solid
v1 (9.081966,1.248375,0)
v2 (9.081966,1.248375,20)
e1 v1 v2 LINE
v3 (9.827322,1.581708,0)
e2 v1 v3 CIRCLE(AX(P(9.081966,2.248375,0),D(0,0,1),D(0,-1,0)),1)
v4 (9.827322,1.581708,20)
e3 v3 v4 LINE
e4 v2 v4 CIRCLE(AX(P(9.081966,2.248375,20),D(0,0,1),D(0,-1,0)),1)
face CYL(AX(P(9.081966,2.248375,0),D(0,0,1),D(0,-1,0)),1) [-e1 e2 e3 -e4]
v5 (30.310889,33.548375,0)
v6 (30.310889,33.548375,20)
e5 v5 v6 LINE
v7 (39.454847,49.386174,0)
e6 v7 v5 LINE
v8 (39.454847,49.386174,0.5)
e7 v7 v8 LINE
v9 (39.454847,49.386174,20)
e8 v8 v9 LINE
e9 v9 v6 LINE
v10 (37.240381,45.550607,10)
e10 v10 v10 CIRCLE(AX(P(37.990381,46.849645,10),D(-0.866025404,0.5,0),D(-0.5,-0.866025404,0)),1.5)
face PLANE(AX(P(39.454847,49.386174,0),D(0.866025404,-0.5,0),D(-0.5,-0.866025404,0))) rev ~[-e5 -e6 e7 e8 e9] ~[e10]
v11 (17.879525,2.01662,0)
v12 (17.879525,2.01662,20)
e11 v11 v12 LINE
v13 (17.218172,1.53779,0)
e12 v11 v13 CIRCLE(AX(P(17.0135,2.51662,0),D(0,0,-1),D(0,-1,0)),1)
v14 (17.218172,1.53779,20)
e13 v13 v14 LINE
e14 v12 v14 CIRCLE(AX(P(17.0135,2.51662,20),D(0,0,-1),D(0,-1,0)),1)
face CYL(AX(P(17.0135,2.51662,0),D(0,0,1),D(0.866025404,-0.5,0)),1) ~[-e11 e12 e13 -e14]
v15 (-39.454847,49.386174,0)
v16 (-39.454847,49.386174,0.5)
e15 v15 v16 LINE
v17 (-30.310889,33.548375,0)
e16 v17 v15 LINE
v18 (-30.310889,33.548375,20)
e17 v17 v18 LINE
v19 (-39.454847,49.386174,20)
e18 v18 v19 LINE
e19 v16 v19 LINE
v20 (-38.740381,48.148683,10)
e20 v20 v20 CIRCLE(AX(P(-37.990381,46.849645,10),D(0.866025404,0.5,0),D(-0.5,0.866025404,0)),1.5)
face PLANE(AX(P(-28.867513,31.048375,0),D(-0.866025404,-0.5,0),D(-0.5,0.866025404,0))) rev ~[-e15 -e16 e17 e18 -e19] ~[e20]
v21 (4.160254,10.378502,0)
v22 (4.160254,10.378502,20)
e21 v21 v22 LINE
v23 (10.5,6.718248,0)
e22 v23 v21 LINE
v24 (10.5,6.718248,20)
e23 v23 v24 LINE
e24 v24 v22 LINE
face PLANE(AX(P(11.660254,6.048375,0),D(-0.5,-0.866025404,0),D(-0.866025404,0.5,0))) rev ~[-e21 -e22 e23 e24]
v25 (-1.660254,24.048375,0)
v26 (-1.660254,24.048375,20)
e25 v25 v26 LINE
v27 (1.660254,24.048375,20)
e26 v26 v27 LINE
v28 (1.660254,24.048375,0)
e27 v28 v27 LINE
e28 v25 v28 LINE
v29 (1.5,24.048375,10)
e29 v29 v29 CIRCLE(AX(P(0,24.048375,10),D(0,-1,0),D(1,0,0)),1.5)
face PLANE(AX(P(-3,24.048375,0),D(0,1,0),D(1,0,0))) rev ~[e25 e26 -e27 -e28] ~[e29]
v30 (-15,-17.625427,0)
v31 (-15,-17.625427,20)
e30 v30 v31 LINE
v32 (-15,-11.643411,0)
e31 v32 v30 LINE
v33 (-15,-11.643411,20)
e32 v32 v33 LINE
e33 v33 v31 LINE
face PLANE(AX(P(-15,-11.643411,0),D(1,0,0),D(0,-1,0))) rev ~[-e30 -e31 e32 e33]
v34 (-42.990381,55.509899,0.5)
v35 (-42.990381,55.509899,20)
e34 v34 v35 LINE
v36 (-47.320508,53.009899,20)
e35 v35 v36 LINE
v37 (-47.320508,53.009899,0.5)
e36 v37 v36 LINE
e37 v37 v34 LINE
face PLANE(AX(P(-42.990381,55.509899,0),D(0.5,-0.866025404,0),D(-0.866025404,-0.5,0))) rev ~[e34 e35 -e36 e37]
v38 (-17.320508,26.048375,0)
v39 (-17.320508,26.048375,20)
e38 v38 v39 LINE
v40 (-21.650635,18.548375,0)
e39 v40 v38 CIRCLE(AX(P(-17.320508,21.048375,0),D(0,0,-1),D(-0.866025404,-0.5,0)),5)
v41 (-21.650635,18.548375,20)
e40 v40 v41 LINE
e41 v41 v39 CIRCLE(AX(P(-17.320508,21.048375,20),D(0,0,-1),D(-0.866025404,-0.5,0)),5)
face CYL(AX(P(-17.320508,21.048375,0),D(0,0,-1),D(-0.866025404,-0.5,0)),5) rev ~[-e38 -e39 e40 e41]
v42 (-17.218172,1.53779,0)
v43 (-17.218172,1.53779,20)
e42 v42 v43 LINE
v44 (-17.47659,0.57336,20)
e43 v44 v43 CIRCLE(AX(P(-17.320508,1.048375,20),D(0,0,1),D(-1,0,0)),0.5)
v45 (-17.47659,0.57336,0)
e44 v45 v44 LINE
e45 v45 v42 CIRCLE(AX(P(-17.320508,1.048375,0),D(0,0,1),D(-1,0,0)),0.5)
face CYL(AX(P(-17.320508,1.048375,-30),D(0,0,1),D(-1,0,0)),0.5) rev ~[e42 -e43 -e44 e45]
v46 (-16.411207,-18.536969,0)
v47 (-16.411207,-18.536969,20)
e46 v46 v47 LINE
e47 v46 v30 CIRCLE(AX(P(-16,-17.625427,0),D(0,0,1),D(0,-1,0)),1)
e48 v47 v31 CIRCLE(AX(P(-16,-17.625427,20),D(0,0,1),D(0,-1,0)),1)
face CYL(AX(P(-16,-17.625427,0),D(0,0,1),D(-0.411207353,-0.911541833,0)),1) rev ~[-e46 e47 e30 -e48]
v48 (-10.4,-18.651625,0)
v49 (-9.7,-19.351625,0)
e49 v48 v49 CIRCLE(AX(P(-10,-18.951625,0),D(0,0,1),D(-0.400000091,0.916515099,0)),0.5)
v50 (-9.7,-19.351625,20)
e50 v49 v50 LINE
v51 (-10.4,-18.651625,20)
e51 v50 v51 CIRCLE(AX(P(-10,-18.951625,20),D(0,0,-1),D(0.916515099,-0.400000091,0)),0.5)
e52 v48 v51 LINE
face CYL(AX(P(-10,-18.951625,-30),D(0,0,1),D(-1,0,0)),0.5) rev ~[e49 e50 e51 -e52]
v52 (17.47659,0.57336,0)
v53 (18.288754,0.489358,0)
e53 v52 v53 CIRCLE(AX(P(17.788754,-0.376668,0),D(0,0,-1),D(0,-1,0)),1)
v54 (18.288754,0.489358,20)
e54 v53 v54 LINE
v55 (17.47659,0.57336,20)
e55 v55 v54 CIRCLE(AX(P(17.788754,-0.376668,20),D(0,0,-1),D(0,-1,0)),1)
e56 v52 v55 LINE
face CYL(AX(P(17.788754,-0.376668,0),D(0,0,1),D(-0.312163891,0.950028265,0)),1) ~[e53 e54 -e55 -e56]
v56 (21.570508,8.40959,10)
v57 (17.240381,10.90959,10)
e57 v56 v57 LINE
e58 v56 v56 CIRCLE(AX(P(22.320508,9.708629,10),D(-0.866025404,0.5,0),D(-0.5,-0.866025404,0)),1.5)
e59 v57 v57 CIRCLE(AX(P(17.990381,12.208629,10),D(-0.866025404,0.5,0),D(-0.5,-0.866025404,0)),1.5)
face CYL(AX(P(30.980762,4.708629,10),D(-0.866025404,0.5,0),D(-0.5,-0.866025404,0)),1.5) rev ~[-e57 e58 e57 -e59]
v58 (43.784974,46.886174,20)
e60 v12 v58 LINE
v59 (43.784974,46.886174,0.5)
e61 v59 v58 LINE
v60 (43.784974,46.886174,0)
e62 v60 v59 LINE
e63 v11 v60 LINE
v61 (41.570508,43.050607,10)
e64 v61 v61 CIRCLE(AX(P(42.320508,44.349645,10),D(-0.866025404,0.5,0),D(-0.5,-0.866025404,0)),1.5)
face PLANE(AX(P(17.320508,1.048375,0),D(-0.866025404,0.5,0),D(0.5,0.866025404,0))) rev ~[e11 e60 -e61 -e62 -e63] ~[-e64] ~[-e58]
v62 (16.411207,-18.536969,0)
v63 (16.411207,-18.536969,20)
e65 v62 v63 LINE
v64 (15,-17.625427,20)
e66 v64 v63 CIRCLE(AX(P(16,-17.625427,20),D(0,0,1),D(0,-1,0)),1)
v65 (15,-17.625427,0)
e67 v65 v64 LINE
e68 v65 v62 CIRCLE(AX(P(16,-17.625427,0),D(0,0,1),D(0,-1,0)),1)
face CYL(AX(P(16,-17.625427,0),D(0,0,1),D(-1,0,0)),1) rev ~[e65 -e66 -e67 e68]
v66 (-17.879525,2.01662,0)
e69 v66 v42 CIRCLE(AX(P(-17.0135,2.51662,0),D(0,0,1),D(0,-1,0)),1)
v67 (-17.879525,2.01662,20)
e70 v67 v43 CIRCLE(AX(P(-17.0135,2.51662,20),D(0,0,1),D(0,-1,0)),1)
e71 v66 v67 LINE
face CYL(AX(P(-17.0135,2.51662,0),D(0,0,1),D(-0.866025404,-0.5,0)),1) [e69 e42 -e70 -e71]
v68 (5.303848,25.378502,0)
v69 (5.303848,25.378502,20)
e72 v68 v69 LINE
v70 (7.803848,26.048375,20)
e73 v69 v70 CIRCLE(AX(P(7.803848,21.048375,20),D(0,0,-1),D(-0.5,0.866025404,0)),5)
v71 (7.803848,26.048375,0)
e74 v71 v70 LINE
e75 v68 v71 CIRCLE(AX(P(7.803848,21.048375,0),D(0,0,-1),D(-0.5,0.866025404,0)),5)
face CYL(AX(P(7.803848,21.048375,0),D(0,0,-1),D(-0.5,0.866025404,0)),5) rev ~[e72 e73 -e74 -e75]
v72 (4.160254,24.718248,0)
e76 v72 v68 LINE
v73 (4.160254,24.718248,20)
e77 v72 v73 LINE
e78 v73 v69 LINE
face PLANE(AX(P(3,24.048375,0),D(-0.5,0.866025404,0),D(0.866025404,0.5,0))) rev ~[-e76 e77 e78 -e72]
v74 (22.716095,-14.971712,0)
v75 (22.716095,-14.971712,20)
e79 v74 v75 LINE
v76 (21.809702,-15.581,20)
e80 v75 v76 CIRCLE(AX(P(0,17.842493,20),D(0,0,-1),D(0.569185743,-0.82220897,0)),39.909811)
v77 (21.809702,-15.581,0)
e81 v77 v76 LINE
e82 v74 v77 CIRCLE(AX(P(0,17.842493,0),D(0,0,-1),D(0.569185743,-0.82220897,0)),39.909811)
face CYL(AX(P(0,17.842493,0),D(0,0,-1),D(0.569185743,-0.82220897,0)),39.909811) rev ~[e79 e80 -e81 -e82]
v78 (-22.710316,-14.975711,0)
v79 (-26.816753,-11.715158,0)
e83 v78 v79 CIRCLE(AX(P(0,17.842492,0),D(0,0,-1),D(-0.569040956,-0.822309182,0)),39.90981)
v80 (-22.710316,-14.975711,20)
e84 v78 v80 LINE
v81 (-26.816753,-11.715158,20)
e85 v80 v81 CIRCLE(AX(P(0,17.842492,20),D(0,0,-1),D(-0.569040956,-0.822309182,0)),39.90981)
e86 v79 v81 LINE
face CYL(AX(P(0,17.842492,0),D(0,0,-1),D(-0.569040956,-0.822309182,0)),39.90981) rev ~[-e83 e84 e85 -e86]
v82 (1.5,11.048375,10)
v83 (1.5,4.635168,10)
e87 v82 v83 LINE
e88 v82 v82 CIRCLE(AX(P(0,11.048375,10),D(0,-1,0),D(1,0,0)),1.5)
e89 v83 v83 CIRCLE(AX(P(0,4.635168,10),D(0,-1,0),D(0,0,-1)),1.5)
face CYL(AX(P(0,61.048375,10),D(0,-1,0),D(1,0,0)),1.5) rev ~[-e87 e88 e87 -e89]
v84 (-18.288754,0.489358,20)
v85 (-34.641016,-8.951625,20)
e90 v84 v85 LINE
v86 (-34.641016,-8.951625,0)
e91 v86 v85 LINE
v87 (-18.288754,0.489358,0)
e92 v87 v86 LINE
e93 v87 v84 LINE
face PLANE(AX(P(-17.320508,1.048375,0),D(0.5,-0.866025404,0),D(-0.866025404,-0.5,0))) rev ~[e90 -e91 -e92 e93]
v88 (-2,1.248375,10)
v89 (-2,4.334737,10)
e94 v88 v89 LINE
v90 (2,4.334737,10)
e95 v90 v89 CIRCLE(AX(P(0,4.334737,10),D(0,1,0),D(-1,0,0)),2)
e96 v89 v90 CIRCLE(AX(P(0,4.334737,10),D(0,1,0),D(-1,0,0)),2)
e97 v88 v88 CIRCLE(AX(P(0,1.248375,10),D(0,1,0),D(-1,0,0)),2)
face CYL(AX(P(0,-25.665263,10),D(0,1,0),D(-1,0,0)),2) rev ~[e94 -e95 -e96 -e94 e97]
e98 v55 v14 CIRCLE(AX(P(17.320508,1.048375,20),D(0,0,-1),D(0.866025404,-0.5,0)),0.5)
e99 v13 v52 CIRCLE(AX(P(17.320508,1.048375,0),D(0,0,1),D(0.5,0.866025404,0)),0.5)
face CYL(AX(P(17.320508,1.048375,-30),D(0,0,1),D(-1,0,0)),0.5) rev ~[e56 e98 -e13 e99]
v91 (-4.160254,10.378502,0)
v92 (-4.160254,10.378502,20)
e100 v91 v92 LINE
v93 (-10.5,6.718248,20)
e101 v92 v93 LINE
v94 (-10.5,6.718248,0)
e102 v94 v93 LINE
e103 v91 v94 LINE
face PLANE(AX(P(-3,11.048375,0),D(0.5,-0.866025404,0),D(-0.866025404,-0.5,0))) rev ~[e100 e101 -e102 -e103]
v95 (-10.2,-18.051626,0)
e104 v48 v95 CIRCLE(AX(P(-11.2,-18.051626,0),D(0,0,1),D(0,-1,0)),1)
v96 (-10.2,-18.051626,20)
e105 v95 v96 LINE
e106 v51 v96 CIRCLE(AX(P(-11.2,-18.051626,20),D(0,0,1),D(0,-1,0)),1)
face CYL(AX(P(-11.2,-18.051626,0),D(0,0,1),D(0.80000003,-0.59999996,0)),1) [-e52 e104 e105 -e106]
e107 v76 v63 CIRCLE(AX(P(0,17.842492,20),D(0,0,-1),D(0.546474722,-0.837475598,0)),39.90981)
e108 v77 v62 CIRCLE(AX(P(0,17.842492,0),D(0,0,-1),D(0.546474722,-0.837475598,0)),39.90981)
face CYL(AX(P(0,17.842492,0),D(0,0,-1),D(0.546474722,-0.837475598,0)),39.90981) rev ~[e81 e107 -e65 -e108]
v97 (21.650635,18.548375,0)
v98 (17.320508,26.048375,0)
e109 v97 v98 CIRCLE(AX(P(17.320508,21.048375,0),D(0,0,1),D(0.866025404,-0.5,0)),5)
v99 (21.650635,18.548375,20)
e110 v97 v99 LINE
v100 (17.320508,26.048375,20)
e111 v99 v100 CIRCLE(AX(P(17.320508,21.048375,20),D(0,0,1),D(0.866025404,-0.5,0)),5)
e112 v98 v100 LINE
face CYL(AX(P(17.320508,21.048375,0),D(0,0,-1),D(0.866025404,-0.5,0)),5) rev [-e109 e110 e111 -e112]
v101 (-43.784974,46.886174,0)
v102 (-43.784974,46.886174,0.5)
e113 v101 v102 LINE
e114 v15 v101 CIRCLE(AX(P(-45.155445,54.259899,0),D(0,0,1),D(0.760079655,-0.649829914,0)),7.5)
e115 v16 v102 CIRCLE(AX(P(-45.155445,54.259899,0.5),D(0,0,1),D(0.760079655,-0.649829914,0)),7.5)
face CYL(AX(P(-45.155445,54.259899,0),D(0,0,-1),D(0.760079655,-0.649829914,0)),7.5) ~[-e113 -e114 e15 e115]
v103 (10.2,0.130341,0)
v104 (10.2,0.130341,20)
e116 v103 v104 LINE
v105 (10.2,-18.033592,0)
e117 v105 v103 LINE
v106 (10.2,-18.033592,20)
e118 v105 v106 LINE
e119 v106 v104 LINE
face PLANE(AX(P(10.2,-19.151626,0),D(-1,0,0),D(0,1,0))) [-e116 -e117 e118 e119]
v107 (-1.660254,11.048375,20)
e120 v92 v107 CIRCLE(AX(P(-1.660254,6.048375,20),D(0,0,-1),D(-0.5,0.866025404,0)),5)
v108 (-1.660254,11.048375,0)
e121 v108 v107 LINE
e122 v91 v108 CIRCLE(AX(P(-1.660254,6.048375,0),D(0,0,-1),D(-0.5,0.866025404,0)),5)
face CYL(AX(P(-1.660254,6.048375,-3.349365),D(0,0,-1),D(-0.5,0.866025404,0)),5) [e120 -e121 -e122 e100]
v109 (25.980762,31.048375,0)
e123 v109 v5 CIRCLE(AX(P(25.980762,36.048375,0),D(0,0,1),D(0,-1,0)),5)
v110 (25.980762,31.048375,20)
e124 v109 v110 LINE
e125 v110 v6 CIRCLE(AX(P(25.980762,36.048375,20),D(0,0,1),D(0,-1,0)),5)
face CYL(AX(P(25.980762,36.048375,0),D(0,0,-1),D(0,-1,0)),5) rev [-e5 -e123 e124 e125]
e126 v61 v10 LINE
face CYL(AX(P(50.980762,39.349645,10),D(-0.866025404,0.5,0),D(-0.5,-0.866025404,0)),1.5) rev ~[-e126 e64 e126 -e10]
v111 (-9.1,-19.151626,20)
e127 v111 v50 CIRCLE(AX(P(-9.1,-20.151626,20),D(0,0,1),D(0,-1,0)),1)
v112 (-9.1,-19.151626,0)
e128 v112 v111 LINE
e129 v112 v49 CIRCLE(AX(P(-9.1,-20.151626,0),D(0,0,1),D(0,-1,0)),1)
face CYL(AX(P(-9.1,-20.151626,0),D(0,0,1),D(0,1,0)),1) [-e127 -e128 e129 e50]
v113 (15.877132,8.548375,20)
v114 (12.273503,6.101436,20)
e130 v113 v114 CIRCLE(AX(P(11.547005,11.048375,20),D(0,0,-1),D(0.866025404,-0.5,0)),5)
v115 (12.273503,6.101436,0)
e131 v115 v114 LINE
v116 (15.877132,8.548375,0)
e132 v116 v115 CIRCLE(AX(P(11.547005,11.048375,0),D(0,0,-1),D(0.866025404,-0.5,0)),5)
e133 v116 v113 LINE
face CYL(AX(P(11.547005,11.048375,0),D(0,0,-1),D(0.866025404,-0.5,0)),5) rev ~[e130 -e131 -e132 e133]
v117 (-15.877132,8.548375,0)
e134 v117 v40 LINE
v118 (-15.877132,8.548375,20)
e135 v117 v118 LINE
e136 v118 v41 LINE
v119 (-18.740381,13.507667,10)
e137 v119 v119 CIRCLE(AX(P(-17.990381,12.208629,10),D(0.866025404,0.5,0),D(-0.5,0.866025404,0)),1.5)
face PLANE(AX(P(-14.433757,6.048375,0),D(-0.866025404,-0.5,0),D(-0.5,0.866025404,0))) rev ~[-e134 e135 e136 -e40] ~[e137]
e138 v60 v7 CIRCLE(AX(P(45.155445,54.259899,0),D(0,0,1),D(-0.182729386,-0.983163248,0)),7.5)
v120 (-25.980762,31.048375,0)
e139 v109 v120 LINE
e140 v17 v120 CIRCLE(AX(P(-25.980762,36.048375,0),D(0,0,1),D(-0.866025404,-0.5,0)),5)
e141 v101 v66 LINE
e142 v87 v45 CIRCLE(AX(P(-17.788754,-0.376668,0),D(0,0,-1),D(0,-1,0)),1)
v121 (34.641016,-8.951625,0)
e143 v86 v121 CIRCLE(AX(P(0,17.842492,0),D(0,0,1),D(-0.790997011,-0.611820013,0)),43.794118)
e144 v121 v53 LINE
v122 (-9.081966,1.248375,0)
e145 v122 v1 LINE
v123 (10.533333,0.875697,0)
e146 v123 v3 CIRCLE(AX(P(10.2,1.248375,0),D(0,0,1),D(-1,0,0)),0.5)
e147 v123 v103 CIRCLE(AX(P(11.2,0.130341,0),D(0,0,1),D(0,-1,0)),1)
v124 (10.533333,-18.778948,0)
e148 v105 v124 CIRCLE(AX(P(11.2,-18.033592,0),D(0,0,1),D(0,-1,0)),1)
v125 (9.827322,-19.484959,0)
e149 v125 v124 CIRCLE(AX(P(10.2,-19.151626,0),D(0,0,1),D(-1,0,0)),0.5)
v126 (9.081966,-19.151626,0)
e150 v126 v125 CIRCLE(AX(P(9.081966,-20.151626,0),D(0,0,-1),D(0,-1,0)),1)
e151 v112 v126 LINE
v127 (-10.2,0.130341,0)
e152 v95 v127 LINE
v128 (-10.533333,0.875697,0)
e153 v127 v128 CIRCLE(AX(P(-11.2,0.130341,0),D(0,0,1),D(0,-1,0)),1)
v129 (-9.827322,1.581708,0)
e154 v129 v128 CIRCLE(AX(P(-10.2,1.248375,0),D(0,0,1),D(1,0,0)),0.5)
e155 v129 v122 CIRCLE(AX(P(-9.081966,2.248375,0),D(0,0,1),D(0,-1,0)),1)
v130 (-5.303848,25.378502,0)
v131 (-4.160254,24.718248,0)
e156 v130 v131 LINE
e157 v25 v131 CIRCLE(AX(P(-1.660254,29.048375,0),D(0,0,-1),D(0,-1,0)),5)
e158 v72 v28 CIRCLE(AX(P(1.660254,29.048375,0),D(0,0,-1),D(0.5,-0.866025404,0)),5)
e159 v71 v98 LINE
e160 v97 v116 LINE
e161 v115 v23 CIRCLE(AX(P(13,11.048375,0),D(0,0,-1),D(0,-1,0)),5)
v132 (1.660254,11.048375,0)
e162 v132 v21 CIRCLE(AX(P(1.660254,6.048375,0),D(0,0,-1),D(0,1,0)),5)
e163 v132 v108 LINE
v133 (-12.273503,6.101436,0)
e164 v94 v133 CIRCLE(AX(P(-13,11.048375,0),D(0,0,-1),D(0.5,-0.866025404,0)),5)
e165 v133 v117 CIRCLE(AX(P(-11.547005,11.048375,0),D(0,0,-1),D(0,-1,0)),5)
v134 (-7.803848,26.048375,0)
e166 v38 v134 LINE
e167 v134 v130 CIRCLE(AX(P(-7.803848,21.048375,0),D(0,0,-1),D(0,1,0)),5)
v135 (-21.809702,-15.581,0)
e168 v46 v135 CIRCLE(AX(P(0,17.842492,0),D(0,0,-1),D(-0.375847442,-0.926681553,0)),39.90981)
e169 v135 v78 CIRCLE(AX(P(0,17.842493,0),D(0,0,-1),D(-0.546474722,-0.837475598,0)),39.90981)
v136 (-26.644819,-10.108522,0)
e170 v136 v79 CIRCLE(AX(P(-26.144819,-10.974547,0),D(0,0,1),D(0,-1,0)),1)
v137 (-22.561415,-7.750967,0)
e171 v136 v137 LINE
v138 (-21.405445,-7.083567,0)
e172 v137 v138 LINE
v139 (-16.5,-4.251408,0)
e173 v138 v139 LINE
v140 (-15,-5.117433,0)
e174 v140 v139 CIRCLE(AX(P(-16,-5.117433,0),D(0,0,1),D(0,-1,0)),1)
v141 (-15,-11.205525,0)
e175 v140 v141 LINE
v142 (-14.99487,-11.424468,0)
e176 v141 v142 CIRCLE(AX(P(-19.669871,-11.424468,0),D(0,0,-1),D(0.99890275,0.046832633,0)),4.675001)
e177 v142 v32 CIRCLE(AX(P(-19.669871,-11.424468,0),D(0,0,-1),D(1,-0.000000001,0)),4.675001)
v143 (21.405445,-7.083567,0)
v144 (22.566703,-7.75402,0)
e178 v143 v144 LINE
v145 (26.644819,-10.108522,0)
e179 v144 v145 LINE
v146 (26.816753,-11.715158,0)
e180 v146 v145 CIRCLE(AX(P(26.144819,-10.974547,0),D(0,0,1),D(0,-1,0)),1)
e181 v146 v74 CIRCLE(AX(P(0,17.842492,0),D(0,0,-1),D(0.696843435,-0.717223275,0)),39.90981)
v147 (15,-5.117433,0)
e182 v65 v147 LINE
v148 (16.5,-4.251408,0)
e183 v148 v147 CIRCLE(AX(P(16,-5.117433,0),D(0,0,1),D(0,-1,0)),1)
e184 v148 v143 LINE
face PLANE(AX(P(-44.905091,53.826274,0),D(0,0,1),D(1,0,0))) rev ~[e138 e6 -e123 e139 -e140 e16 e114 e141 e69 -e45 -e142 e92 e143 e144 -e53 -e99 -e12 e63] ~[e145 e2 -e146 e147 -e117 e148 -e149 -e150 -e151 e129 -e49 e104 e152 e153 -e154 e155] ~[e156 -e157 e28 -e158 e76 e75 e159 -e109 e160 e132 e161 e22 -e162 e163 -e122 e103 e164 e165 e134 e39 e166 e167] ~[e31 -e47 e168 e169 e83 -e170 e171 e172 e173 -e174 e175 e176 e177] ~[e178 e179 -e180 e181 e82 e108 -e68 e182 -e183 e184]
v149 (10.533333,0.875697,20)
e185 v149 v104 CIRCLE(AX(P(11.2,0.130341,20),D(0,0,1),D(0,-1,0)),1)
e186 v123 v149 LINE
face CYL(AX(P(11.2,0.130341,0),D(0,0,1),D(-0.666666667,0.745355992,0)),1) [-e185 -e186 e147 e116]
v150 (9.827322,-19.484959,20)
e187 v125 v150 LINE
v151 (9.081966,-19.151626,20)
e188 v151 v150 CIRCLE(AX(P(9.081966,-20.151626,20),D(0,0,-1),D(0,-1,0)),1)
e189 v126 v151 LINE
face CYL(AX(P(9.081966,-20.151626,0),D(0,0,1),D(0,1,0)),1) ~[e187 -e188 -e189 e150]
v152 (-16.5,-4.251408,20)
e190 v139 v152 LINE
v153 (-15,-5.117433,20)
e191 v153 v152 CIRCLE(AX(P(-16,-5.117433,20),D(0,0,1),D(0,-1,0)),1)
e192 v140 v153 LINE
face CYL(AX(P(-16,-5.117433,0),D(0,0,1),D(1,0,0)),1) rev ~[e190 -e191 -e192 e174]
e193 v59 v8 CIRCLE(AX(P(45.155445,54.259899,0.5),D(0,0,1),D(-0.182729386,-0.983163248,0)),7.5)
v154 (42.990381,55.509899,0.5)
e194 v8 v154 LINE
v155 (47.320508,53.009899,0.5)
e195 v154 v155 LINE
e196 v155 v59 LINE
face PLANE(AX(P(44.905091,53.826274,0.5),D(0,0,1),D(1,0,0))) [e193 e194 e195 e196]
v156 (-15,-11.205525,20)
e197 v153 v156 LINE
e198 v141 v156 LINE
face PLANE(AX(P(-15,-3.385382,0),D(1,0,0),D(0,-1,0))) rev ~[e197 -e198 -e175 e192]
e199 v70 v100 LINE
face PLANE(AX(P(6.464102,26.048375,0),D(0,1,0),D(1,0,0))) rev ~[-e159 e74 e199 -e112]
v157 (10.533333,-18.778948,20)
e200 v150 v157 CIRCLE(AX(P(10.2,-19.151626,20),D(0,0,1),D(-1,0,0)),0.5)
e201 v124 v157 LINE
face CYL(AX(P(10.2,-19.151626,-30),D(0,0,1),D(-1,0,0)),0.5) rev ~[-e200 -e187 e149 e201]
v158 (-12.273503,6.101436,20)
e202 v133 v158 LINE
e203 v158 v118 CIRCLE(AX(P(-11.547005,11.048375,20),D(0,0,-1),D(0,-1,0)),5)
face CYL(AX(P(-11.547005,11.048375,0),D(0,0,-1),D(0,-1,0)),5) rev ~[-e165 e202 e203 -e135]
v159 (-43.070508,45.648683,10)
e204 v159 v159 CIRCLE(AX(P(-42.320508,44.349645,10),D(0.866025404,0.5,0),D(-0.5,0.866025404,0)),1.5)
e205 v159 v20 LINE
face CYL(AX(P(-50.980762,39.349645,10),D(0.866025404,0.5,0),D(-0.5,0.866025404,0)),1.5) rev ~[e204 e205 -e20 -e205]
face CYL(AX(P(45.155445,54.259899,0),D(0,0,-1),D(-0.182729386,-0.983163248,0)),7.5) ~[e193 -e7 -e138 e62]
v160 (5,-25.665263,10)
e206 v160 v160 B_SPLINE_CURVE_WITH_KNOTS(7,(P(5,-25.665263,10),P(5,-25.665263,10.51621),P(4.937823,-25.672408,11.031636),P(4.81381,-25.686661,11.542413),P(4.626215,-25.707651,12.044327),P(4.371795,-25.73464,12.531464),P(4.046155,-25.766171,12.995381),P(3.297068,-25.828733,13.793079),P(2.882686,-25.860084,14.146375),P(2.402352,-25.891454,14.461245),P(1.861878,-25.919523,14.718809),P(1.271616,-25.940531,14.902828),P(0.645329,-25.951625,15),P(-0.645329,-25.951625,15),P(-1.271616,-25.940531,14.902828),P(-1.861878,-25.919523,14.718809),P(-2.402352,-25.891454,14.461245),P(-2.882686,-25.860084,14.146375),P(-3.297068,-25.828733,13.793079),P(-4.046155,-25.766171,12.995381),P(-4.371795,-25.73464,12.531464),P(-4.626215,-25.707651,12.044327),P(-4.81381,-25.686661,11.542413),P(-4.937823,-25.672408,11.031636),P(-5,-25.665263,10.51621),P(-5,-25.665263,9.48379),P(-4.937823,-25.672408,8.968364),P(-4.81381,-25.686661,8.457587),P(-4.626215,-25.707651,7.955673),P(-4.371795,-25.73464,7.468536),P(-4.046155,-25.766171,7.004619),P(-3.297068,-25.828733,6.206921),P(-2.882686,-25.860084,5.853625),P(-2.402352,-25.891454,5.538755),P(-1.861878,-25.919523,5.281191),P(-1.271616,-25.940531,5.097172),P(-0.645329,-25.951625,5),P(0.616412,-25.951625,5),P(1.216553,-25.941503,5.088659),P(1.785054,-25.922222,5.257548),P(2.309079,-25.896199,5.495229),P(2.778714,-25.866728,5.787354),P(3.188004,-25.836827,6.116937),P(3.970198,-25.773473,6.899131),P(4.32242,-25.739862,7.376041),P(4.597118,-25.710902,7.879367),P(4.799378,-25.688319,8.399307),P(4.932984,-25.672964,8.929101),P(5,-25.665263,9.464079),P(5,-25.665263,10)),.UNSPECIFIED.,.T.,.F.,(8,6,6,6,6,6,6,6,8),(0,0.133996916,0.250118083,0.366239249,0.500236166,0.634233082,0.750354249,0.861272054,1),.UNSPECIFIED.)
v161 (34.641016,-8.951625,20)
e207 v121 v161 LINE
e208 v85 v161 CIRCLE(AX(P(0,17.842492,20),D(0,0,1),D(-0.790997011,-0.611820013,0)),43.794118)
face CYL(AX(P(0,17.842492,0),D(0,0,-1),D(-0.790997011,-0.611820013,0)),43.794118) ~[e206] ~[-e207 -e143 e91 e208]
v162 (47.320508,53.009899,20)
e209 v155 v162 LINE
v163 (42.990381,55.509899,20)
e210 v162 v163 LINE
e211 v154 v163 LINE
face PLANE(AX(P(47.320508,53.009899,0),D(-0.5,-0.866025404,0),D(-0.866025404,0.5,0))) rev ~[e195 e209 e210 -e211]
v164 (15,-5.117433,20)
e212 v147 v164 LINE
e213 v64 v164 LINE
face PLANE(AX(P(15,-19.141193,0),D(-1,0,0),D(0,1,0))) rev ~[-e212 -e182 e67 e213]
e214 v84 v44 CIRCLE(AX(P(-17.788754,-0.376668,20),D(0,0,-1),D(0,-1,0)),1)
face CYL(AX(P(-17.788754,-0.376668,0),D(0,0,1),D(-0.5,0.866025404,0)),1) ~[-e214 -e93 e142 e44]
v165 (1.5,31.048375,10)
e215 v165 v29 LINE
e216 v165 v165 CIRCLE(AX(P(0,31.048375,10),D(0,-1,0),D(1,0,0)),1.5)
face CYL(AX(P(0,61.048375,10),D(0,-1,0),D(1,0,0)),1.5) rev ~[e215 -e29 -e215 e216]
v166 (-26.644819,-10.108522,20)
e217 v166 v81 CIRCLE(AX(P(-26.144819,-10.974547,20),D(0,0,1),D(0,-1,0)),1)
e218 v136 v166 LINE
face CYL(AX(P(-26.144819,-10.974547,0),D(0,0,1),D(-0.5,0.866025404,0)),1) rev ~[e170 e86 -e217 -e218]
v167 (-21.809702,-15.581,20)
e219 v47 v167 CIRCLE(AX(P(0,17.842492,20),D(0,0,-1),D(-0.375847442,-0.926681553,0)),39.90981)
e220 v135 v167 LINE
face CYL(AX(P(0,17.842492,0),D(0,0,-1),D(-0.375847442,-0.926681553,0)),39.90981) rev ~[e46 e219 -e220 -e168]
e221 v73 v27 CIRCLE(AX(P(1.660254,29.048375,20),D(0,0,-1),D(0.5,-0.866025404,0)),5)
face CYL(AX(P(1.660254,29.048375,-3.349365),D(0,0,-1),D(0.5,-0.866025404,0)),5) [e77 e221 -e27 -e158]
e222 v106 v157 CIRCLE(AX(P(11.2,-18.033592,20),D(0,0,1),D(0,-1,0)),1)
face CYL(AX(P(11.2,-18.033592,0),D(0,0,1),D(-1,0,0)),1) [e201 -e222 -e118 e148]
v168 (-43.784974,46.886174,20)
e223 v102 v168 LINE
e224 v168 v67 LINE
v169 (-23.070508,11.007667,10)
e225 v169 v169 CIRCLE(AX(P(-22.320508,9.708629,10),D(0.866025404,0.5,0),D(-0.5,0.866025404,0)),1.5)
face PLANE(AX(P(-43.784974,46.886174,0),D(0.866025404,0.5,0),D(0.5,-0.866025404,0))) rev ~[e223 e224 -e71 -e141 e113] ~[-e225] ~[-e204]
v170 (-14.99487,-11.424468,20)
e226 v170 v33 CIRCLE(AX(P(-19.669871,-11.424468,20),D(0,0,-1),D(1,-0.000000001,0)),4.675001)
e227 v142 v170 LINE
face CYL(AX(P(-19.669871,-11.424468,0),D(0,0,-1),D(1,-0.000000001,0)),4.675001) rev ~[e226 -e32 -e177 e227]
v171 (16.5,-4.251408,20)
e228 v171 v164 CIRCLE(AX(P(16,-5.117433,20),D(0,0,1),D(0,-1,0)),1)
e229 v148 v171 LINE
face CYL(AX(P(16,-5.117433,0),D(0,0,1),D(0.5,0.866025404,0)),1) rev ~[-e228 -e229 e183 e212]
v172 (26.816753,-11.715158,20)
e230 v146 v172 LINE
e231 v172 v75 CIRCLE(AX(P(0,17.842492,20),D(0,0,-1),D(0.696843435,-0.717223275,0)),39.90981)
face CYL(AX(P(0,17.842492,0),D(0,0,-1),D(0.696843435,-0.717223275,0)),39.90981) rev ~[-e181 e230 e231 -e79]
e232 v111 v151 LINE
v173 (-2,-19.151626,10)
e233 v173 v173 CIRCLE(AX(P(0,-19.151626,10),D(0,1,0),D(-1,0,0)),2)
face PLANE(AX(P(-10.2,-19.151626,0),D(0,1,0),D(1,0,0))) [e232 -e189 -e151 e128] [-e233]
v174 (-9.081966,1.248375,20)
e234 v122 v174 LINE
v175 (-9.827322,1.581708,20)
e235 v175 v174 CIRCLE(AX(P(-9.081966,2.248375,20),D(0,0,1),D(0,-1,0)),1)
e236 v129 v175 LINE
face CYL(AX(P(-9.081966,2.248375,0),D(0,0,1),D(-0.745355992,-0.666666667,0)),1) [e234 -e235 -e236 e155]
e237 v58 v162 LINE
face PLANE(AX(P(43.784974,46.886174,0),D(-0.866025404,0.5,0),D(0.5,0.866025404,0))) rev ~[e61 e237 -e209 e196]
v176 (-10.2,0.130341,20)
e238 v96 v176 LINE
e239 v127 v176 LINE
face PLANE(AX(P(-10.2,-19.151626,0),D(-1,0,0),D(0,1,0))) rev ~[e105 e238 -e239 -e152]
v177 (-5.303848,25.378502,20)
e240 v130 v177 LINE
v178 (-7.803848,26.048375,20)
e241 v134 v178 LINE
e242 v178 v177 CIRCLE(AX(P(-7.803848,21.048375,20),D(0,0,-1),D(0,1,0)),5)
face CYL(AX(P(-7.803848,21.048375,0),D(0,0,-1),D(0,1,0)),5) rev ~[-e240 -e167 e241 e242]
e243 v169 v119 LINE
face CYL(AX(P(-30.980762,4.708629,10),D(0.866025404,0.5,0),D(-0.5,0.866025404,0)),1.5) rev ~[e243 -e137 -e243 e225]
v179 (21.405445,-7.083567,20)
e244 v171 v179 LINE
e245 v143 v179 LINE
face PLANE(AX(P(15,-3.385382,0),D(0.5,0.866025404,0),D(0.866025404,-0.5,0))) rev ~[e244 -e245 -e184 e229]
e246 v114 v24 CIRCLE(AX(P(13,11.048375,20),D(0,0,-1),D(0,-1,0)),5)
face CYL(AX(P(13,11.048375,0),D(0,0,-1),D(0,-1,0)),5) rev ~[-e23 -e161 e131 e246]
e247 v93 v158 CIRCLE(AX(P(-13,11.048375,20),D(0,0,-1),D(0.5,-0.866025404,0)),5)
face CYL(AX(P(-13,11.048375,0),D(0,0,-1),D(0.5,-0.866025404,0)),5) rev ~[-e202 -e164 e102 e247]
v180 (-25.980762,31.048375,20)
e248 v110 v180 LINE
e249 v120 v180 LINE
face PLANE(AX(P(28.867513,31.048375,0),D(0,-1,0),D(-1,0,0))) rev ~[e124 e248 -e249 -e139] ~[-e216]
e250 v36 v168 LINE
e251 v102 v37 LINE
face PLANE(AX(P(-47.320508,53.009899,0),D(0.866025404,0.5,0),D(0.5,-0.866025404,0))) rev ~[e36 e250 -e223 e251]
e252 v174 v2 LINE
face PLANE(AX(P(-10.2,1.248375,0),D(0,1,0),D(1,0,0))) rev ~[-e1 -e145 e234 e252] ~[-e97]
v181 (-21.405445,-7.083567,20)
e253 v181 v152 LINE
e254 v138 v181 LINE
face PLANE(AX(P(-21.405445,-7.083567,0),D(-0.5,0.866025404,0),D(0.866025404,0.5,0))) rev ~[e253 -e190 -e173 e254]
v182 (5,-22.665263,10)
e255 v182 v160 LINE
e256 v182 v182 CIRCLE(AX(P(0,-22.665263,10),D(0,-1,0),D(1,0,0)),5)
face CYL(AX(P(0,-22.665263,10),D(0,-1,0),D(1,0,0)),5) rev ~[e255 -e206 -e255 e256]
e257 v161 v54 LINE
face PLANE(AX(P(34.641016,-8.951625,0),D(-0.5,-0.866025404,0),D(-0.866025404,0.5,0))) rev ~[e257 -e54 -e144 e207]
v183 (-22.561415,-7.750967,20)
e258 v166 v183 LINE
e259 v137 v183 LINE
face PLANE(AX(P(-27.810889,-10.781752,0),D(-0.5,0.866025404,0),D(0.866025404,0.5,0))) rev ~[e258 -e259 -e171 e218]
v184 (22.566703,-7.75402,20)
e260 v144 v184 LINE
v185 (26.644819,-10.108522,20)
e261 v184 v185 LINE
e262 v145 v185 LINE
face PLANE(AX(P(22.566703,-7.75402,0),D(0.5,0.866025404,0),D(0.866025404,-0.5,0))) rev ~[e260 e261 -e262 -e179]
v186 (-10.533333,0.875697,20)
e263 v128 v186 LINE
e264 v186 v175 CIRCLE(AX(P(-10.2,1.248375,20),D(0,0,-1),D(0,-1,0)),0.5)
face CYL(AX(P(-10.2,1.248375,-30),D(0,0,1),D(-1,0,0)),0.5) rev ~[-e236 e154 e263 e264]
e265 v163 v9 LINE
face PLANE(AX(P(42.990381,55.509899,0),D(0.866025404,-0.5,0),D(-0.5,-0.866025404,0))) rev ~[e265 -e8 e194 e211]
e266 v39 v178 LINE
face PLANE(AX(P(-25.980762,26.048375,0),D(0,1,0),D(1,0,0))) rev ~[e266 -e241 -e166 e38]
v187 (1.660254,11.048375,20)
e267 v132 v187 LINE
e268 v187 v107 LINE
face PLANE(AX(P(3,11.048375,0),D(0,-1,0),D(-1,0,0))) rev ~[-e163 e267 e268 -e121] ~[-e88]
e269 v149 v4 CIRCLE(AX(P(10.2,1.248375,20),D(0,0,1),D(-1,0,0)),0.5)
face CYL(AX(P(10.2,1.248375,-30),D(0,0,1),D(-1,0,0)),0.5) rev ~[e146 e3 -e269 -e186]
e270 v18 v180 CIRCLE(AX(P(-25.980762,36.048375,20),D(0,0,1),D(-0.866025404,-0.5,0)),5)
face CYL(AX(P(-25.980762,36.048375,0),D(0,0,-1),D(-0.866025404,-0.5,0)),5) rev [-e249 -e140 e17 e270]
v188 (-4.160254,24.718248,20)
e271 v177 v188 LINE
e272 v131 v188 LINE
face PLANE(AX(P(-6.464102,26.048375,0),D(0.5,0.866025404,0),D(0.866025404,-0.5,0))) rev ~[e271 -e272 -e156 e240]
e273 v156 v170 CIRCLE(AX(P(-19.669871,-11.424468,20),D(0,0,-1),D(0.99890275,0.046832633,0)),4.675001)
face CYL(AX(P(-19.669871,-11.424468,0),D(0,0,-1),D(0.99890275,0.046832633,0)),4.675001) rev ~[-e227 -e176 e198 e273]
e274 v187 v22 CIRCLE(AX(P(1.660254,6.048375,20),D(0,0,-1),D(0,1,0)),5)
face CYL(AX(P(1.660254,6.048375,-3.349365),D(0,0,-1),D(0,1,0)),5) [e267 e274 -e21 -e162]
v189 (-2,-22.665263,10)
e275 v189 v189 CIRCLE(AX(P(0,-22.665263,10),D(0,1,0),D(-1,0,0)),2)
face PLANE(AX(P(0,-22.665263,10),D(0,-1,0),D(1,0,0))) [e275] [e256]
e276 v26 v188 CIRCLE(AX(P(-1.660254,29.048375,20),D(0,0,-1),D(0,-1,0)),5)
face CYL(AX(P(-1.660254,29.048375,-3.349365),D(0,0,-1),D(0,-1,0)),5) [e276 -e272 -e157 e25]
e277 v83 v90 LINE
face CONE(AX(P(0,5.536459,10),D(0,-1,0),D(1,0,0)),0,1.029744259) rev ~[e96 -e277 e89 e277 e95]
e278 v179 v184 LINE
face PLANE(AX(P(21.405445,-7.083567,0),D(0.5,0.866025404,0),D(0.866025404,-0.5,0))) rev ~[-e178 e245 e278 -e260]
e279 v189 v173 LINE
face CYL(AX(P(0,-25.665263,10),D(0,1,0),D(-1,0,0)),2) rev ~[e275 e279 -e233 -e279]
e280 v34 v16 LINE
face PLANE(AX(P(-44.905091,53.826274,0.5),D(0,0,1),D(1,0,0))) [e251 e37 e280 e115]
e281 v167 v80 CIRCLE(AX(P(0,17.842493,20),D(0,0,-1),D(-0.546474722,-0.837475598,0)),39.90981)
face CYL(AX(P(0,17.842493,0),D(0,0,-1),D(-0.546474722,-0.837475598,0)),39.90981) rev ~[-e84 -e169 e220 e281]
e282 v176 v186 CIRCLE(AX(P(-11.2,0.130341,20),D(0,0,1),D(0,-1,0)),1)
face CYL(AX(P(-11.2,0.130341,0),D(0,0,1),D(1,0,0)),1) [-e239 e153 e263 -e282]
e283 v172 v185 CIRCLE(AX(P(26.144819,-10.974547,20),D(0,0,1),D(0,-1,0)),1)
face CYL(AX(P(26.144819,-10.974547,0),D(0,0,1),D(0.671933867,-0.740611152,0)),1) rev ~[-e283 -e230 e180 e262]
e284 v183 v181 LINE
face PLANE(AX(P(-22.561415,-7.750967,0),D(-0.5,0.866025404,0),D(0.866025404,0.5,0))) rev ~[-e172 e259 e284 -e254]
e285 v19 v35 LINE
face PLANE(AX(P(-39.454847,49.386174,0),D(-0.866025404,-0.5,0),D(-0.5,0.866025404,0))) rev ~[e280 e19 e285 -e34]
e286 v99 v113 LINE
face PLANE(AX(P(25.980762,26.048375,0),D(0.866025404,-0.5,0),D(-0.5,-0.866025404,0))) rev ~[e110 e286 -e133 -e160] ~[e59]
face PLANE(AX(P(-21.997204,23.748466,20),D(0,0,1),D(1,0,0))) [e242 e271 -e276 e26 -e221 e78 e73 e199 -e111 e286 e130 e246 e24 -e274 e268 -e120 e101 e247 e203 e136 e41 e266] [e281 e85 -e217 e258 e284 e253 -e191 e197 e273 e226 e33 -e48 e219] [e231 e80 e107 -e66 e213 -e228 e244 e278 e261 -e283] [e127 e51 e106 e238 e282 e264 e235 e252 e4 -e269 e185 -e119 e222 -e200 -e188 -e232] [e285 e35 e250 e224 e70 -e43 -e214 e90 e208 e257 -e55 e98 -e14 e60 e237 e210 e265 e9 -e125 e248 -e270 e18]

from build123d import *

# Parameters (mm, degrees)
F0_W            = 20.400000091
F0_H            = 20.400000091
F1_DEPTH        = 20
F7_D            = 3
F7_DEPTH        = 10
F7_TIP          = 0.9012909285
F8_D            = 3
F8_DEPTH        = 10
F8_TIP          = 0.9012909285
F9_D            = 3
F9_DEPTH        = 30
F9_TIP          = 0.9012909285
F10_D           = 4
F10_DEPTH       = 30
F10_START       = 0.3347373
F10_CBORE_D     = 10
F10_CBORE_DEPTH = 3
F10_TIP         = 1.2017212381
F11_D           = 1
F11_DEPTH       = 30
F11_TIP         = 0.3004303095
F12_R           = 1
F13_T1_DEPTH    = 20
F13_T3_DEPTH    = 26.6987298108
F14_DEPTH       = 0.5


# Not quite as in the source:
# - a fillet or chamfer that OpenCascade refuses, or shapes differently, is made with other operations: its cross-section is extruded or revolved along the edge and cut away or added


with BuildPart() as f1:
    # F0 (on Top) → F1 (new body)
    with BuildSketch(Plane.XY):
        Polygon((6.4641016151, 26.0483745358), (17.9807621135, 26.0483745358), (17.9807621135, 31.0483745358), (-17.9807621135, 31.0483745358), (-17.9807621135, 26.0483745358), (-6.4641016151, 26.0483745358), align=None)
        Polygon((-17.9807621135, 26.0483745358), (-17.9807621135, 31.0483745358), (-28.8675134595, 31.0483745358), (-25.9807621135, 26.0483745358), align=None)
        with BuildLine():
            Line((25.9807621135, 26.0483745358), (14.4337567297, 6.0483745358))
            Line((14.4337567297, 6.0483745358), (11.6602540378, 6.0483745358))
            Line((11.6602540378, 6.0483745358), (-11.6602540378, 6.0483745358))
            Line((-11.6602540378, 6.0483745358), (-14.4337567297, 6.0483745358))
            Line((-14.4337567297, 6.0483745358), (-25.9807621135, 26.0483745358))
            Line((-25.9807621135, 26.0483745358), (-28.8675134595, 31.0483745358))
            Line((-28.8675134595, 31.0483745358), (-39.4548471508, 49.3861744059))
            Line((-39.4548471508, 49.3861744059), (-42.9903810568, 55.5098987629))
            Line((-42.9903810568, 55.5098987629), (-47.3205080757, 53.0098987629))
            Line((-47.3205080757, 53.0098987629), (-43.7849741698, 46.8861744059))
            Line((-43.7849741698, 46.8861744059), (-17.3205080757, 1.0483745358))
            Line((-17.3205080757, 1.0483745358), (-34.6410161514, -8.9516254642))
            ThreePointArc((-34.6410161514, -8.9516254642), (0, -25.9516254642), (34.6410161514, -8.9516254642))
            Line((34.6410161514, -8.9516254642), (17.3205080757, 1.0483745358))
            Line((17.3205080757, 1.0483745358), (43.7849741698, 46.8861744059))
            Line((43.7849741698, 46.8861744059), (47.3205080757, 53.0098987629))
            Line((47.3205080757, 53.0098987629), (42.9903810568, 55.5098987629))
            Line((42.9903810568, 55.5098987629), (39.4548471508, 49.3861744059))
            Line((39.4548471508, 49.3861744059), (28.8675134595, 31.0483745358))
            Line((28.8675134595, 31.0483745358), (25.9807621135, 26.0483745358))
        make_face()
        with BuildLine():
            ThreePointArc((-22.7103164413, -14.9757110612), (-25.3474924854, -12.9844045429), (-27.8108891325, -10.7817524831))
            Line((-27.8108891325, -10.7817524831), (-22.5614149358, -7.7509671426))
            ThreePointArc((-22.5614149358, -7.7509671426), (-22.0073717449, -7.3757984906), (-21.4054445662, -7.0835673385))
            Line((-21.4054445662, -7.0835673385), (-15, -3.3853821939))
            Line((-15, -3.3853821939), (-15, -9.7067520427))
            Line((-15, -9.7067520427), (-15, -11.2055254497))
            ThreePointArc((-15, -11.2055254497), (-14.9961529432, -11.3149667107), (-14.9948703563, -11.424468055))
            ThreePointArc((-14.9948703563, -11.424468055), (-14.9961529432, -11.5339693994), (-15, -11.6434106603))
            Line((-15, -11.6434106603), (-15, -19.1411925583))
            ThreePointArc((-15, -19.1411925583), (-18.4907352427, -17.5253696018), (-21.8097023517, -15.5809998604))
            ThreePointArc((-21.8097023517, -15.5809998604), (-22.2776306814, -15.3045743127), (-22.7103164413, -14.9757110612))
        make_face(mode=Mode.SUBTRACT)
        with Locations((0, -8.9516254642)):
            Rectangle(F0_W, F0_H, mode=Mode.SUBTRACT)
        with BuildLine():
            Line((22.5667029919, -7.7540202032), (27.8108891325, -10.7817524831))
            ThreePointArc((27.8108891325, -10.7817524831), (25.350206463, -12.9821727678), (22.7160948799, -14.9717116082))
            ThreePointArc((22.7160948799, -14.9717116082), (22.280757774, -15.3029234672), (21.8097023517, -15.5809998604))
            ThreePointArc((21.8097023517, -15.5809998604), (18.4907352427, -17.5253696018), (15, -19.1411925583))
            Line((15, -19.1411925583), (15, -11.4242956019))
            Line((15, -11.4242956019), (15, -3.3853821939))
            Line((15, -3.3853821939), (21.4054445662, -7.0835673385))
            ThreePointArc((21.4054445662, -7.0835673385), (22.0102443295, -7.3769291493), (22.5667029919, -7.7540202032))
        make_face(mode=Mode.SUBTRACT)
        Polygon((-11.6602540378, 6.0483745358), (11.6602540378, 6.0483745358), (3, 11.0483745358), (-3, 11.0483745358), align=None)
        Polygon((3, 24.0483745358), (6.4641016151, 26.0483745358), (-6.4641016151, 26.0483745358), (-3, 24.0483745358), align=None)
        Polygon((17.9807621135, 26.0483745358), (25.9807621135, 26.0483745358), (28.8675134595, 31.0483745358), (17.9807621135, 31.0483745358), align=None)
        with BuildLine():
            ThreePointArc((21.8097023517, -15.5809998604), (22.280757774, -15.3029234672), (22.7160948799, -14.9717116082))
            ThreePointArc((22.7160948799, -14.9717116082), (22.2649828839, -15.2794563439), (21.8097023517, -15.5809998604))
        make_face()
        with BuildLine():
            ThreePointArc((-21.8097023517, -15.5809998604), (-22.2620666598, -15.2814164794), (-22.7103164413, -14.9757110612))
            ThreePointArc((-22.7103164413, -14.9757110612), (-22.2776306814, -15.3045743127), (-21.8097023517, -15.5809998604))
        make_face()
        with BuildLine():
            ThreePointArc((-21.4054445662, -7.0835673385), (-22.0073717449, -7.3757984906), (-22.5614149358, -7.7509671426))
            Line((-22.5614149358, -7.7509671426), (-21.4054445662, -7.0835673385))
        make_face()
        with BuildLine():
            Line((21.4054445662, -7.0835673385), (22.5667029919, -7.7540202032))
            ThreePointArc((22.5667029919, -7.7540202032), (22.0102443295, -7.3769291493), (21.4054445662, -7.0835673385))
        make_face()
    extrude(amount=F1_DEPTH)

    # F7
    with Locations(Plane(origin=(12.5364215664, -7.237906366, 0), x_dir=(0.5, 0.8660254038, 0), z_dir=(0.8660254038, -0.5, 0))):
        with Locations((19.5681730185, 10), (59.5681730185, 10)):
            Hole(F7_D / 2, depth=F7_DEPTH)
            with Locations((0, 0, -(F7_DEPTH + F7_TIP / 2))):  # 118° drill point
                Cone(0, F7_D / 2, F7_TIP, mode=Mode.SUBTRACT)

    # F8
    with Locations(Plane(origin=(-12.5364215664, -7.237906366, 0), x_dir=(0.5, -0.8660254038, 0), z_dir=(-0.8660254038, -0.5, 0))):
        with Locations((-19.5681730185, 10), (-59.5681730185, 10)):
            Hole(F8_D / 2, depth=F8_DEPTH)
            with Locations((0, 0, -(F8_DEPTH + F8_TIP / 2))):  # 118° drill point
                Cone(0, F8_D / 2, F8_TIP, mode=Mode.SUBTRACT)

    # F9
    with Locations(Plane(origin=(0, 31.0483745358, 0), x_dir=(-1, 0, 0), z_dir=(0, 1, 0))):
        with Locations((0, 10)):
            Hole(F9_D / 2, depth=F9_DEPTH)
            with Locations((0, 0, -(F9_DEPTH + F9_TIP / 2))):  # 118° drill point
                Cone(0, F9_D / 2, F9_TIP, mode=Mode.SUBTRACT)

    # F10
    # its depths count from where the whole tool has entered the part; down to there all is cleared
    with Locations(Plane.XZ.offset(26).offset(-F10_START)):
        with Locations((0, 10)):
            CounterBoreHole(F10_D / 2, F10_CBORE_D / 2, F10_CBORE_DEPTH, depth=F10_DEPTH)
            with Locations((0, 0, -(F10_DEPTH + F10_TIP / 2))):  # 118° drill point
                Cone(0, F10_D / 2, F10_TIP, mode=Mode.SUBTRACT)

    # F11
    with Locations(Plane(origin=(0, 0, 0), x_dir=(1, 0, 0), z_dir=(0, 0, -1))):
        with Locations((10.2000000455, -1.2483745813), (10.2000000455, 19.1516255097), (-10, 18.9516254642), (-10.2000000455, -1.2483745813), (-17.3205080757, -1.0483745358), (17.3205080757, -1.0483745358)):
            Hole(F11_D / 2, depth=F11_DEPTH)
            with Locations((0, 0, -(F11_DEPTH + F11_TIP / 2))):  # 118° drill point
                Cone(0, F11_D / 2, F11_TIP, mode=Mode.SUBTRACT)

    # F12
    f12_edges = [f1.edges().sort_by_distance(p)[0] for p in [
        (15, -19.141193, 10),
        (15, -3.385382, 10),
        (27.810889, -10.781752, 10),
        (-15, -3.385382, 10),
        (-27.810889, -10.781752, 10),
        (-15, -19.141193, 10),
        (-17.570508, 1.481387, 10),
        (17.570508, 1.481387, 10),
        (17.753521, 0.798375, 10),
        (-9.541742, -19.151626, 10),
        (9.7, -19.151626, 10),
        (10.2, -18.651626, 10),
        (10.2, 0.748375, 10),
        (9.7, 1.248375, 10),
        (-9.7, 1.248375, 10),
        (-10.2, 0.748375, 10),
        (-10.2, -18.493368, 10),
        (-17.753521, 0.798375, 10),
    ]]
    fillet(f12_edges, radius=F12_R)

    # F13: fillet of radius 5 on 14 edges, made by hand

    # F13_s2 → F13_t1 (join)
    with BuildSketch(Plane.XY):
        with BuildLine():
            ThreePointArc((-21.6506350946, 18.5483745358), (-21.6506350946, 23.5483745358), (-17.3205080757, 26.0483745358))
            Line((-17.3205080757, 26.0483745358), (-25.9807621135, 26.0483745358))
            Line((-25.9807621135, 26.0483745358), (-21.6506350946, 18.5483745358))
        make_face()
        with BuildLine():
            ThreePointArc((21.6506350946, 18.5483745358), (21.6506350946, 23.5483745358), (17.3205080757, 26.0483745358))
            Line((17.3205080757, 26.0483745358), (25.9807621135, 26.0483745358))
            Line((25.9807621135, 26.0483745358), (21.6506350946, 18.5483745358))
        make_face()
        with BuildLine():
            ThreePointArc((15.8771324027, 8.5483745358), (14.0470053838, 6.7182475169), (11.5470053838, 6.0483745358))
            Line((11.5470053838, 6.0483745358), (14.4337567297, 6.0483745358))
            Line((14.4337567297, 6.0483745358), (15.8771324027, 8.5483745358))
        make_face()
        with BuildLine():
            ThreePointArc((-11.5470053838, 6.0483745358), (-14.0470053838, 6.7182475169), (-15.8771324027, 8.5483745358))
            Line((-15.8771324027, 8.5483745358), (-14.4337567297, 6.0483745358))
            Line((-14.4337567297, 6.0483745358), (-11.5470053838, 6.0483745358))
        make_face()
        with BuildLine():
            ThreePointArc((-30.3108891325, 33.5483745358), (-28.4807621135, 31.7182475169), (-25.9807621135, 31.0483745358))
            Line((-25.9807621135, 31.0483745358), (-28.8675134595, 31.0483745358))
            Line((-28.8675134595, 31.0483745358), (-30.3108891325, 33.5483745358))
        make_face()
        with BuildLine():
            ThreePointArc((25.9807621135, 31.0483745358), (28.4807621135, 31.7182475169), (30.3108891325, 33.5483745358))
            Line((30.3108891325, 33.5483745358), (28.8675134595, 31.0483745358))
            Line((28.8675134595, 31.0483745358), (25.9807621135, 31.0483745358))
        make_face()
        with BuildLine():
            ThreePointArc((5.3038475773, 25.3785015547), (6.5097523518, 25.8780036673), (7.8038475773, 26.0483745358))
            Line((7.8038475773, 26.0483745358), (6.4641016151, 26.0483745358))
            Line((6.4641016151, 26.0483745358), (5.3038475773, 25.3785015547))
        make_face()
        with BuildLine():
            ThreePointArc((-7.8038475773, 26.0483745358), (-6.5097523518, 25.8780036673), (-5.3038475773, 25.3785015547))
            Line((-5.3038475773, 25.3785015547), (-6.4641016151, 26.0483745358))
            Line((-6.4641016151, 26.0483745358), (-7.8038475773, 26.0483745358))
        make_face()
        with BuildLine():
            ThreePointArc((-10.5, 6.7182475169), (-11.7059047745, 6.2187454044), (-13, 6.0483745358))
            Line((-13, 6.0483745358), (-11.6602540378, 6.0483745358))
            Line((-11.6602540378, 6.0483745358), (-10.5, 6.7182475169))
        make_face()
        with BuildLine():
            ThreePointArc((13, 6.0483745358), (11.7059047745, 6.2187454044), (10.5, 6.7182475169))
            Line((10.5, 6.7182475169), (11.6602540378, 6.0483745358))
            Line((11.6602540378, 6.0483745358), (13, 6.0483745358))
        make_face()
    extrude(amount=F13_T1_DEPTH)

    # F13_s4 → F13_t3 (cut)
    with BuildSketch(Plane.XY.offset(-3.3493649054)):
        with BuildLine():
            ThreePointArc((4.1602540378, 24.7182475169), (2.9543492634, 24.2187454044), (1.6602540378, 24.0483745358))
            Line((1.6602540378, 24.0483745358), (3, 24.0483745358))
            Line((3, 24.0483745358), (4.1602540378, 24.7182475169))
        make_face()
        with BuildLine():
            ThreePointArc((-1.6602540378, 24.0483745358), (-2.9543492634, 24.2187454044), (-4.1602540378, 24.7182475169))
            Line((-4.1602540378, 24.7182475169), (-3, 24.0483745358))
            Line((-3, 24.0483745358), (-1.6602540378, 24.0483745358))
        make_face()
        with BuildLine():
            ThreePointArc((-4.1602540378, 10.3785015547), (-2.9543492634, 10.8780036673), (-1.6602540378, 11.0483745358))
            Line((-1.6602540378, 11.0483745358), (-3, 11.0483745358))
            Line((-3, 11.0483745358), (-4.1602540378, 10.3785015547))
        make_face()
        with BuildLine():
            ThreePointArc((1.6602540378, 11.0483745358), (2.9543492634, 10.8780036673), (4.1602540378, 10.3785015547))
            Line((4.1602540378, 10.3785015547), (3, 11.0483745358))
            Line((3, 11.0483745358), (1.6602540378, 11.0483745358))
        make_face()
    extrude(amount=F13_T3_DEPTH, mode=Mode.SUBTRACT)

    # F0 (on Top) → F14 (join)
    with BuildSketch(Plane.XY):
        with BuildLine():
            Line((-42.9903810568, 55.5098987629), (-39.4548471508, 49.3861744059))
            ThreePointArc((-39.4548471508, 49.3861744059), (-48.9054445662, 60.7550892913), (-43.7849741698, 46.8861744059))
            Line((-43.7849741698, 46.8861744059), (-47.3205080757, 53.0098987629))
            Line((-47.3205080757, 53.0098987629), (-42.9903810568, 55.5098987629))
        make_face()
        with BuildLine():
            ThreePointArc((43.7849741698, 46.8861744059), (48.9054445662, 60.7550892913), (39.4548471508, 49.3861744059))
            Line((39.4548471508, 49.3861744059), (42.9903810568, 55.5098987629))
            Line((42.9903810568, 55.5098987629), (47.3205080757, 53.0098987629))
            Line((47.3205080757, 53.0098987629), (43.7849741698, 46.8861744059))
        make_face()
    extrude(amount=F14_DEPTH)


solid = f1.part
